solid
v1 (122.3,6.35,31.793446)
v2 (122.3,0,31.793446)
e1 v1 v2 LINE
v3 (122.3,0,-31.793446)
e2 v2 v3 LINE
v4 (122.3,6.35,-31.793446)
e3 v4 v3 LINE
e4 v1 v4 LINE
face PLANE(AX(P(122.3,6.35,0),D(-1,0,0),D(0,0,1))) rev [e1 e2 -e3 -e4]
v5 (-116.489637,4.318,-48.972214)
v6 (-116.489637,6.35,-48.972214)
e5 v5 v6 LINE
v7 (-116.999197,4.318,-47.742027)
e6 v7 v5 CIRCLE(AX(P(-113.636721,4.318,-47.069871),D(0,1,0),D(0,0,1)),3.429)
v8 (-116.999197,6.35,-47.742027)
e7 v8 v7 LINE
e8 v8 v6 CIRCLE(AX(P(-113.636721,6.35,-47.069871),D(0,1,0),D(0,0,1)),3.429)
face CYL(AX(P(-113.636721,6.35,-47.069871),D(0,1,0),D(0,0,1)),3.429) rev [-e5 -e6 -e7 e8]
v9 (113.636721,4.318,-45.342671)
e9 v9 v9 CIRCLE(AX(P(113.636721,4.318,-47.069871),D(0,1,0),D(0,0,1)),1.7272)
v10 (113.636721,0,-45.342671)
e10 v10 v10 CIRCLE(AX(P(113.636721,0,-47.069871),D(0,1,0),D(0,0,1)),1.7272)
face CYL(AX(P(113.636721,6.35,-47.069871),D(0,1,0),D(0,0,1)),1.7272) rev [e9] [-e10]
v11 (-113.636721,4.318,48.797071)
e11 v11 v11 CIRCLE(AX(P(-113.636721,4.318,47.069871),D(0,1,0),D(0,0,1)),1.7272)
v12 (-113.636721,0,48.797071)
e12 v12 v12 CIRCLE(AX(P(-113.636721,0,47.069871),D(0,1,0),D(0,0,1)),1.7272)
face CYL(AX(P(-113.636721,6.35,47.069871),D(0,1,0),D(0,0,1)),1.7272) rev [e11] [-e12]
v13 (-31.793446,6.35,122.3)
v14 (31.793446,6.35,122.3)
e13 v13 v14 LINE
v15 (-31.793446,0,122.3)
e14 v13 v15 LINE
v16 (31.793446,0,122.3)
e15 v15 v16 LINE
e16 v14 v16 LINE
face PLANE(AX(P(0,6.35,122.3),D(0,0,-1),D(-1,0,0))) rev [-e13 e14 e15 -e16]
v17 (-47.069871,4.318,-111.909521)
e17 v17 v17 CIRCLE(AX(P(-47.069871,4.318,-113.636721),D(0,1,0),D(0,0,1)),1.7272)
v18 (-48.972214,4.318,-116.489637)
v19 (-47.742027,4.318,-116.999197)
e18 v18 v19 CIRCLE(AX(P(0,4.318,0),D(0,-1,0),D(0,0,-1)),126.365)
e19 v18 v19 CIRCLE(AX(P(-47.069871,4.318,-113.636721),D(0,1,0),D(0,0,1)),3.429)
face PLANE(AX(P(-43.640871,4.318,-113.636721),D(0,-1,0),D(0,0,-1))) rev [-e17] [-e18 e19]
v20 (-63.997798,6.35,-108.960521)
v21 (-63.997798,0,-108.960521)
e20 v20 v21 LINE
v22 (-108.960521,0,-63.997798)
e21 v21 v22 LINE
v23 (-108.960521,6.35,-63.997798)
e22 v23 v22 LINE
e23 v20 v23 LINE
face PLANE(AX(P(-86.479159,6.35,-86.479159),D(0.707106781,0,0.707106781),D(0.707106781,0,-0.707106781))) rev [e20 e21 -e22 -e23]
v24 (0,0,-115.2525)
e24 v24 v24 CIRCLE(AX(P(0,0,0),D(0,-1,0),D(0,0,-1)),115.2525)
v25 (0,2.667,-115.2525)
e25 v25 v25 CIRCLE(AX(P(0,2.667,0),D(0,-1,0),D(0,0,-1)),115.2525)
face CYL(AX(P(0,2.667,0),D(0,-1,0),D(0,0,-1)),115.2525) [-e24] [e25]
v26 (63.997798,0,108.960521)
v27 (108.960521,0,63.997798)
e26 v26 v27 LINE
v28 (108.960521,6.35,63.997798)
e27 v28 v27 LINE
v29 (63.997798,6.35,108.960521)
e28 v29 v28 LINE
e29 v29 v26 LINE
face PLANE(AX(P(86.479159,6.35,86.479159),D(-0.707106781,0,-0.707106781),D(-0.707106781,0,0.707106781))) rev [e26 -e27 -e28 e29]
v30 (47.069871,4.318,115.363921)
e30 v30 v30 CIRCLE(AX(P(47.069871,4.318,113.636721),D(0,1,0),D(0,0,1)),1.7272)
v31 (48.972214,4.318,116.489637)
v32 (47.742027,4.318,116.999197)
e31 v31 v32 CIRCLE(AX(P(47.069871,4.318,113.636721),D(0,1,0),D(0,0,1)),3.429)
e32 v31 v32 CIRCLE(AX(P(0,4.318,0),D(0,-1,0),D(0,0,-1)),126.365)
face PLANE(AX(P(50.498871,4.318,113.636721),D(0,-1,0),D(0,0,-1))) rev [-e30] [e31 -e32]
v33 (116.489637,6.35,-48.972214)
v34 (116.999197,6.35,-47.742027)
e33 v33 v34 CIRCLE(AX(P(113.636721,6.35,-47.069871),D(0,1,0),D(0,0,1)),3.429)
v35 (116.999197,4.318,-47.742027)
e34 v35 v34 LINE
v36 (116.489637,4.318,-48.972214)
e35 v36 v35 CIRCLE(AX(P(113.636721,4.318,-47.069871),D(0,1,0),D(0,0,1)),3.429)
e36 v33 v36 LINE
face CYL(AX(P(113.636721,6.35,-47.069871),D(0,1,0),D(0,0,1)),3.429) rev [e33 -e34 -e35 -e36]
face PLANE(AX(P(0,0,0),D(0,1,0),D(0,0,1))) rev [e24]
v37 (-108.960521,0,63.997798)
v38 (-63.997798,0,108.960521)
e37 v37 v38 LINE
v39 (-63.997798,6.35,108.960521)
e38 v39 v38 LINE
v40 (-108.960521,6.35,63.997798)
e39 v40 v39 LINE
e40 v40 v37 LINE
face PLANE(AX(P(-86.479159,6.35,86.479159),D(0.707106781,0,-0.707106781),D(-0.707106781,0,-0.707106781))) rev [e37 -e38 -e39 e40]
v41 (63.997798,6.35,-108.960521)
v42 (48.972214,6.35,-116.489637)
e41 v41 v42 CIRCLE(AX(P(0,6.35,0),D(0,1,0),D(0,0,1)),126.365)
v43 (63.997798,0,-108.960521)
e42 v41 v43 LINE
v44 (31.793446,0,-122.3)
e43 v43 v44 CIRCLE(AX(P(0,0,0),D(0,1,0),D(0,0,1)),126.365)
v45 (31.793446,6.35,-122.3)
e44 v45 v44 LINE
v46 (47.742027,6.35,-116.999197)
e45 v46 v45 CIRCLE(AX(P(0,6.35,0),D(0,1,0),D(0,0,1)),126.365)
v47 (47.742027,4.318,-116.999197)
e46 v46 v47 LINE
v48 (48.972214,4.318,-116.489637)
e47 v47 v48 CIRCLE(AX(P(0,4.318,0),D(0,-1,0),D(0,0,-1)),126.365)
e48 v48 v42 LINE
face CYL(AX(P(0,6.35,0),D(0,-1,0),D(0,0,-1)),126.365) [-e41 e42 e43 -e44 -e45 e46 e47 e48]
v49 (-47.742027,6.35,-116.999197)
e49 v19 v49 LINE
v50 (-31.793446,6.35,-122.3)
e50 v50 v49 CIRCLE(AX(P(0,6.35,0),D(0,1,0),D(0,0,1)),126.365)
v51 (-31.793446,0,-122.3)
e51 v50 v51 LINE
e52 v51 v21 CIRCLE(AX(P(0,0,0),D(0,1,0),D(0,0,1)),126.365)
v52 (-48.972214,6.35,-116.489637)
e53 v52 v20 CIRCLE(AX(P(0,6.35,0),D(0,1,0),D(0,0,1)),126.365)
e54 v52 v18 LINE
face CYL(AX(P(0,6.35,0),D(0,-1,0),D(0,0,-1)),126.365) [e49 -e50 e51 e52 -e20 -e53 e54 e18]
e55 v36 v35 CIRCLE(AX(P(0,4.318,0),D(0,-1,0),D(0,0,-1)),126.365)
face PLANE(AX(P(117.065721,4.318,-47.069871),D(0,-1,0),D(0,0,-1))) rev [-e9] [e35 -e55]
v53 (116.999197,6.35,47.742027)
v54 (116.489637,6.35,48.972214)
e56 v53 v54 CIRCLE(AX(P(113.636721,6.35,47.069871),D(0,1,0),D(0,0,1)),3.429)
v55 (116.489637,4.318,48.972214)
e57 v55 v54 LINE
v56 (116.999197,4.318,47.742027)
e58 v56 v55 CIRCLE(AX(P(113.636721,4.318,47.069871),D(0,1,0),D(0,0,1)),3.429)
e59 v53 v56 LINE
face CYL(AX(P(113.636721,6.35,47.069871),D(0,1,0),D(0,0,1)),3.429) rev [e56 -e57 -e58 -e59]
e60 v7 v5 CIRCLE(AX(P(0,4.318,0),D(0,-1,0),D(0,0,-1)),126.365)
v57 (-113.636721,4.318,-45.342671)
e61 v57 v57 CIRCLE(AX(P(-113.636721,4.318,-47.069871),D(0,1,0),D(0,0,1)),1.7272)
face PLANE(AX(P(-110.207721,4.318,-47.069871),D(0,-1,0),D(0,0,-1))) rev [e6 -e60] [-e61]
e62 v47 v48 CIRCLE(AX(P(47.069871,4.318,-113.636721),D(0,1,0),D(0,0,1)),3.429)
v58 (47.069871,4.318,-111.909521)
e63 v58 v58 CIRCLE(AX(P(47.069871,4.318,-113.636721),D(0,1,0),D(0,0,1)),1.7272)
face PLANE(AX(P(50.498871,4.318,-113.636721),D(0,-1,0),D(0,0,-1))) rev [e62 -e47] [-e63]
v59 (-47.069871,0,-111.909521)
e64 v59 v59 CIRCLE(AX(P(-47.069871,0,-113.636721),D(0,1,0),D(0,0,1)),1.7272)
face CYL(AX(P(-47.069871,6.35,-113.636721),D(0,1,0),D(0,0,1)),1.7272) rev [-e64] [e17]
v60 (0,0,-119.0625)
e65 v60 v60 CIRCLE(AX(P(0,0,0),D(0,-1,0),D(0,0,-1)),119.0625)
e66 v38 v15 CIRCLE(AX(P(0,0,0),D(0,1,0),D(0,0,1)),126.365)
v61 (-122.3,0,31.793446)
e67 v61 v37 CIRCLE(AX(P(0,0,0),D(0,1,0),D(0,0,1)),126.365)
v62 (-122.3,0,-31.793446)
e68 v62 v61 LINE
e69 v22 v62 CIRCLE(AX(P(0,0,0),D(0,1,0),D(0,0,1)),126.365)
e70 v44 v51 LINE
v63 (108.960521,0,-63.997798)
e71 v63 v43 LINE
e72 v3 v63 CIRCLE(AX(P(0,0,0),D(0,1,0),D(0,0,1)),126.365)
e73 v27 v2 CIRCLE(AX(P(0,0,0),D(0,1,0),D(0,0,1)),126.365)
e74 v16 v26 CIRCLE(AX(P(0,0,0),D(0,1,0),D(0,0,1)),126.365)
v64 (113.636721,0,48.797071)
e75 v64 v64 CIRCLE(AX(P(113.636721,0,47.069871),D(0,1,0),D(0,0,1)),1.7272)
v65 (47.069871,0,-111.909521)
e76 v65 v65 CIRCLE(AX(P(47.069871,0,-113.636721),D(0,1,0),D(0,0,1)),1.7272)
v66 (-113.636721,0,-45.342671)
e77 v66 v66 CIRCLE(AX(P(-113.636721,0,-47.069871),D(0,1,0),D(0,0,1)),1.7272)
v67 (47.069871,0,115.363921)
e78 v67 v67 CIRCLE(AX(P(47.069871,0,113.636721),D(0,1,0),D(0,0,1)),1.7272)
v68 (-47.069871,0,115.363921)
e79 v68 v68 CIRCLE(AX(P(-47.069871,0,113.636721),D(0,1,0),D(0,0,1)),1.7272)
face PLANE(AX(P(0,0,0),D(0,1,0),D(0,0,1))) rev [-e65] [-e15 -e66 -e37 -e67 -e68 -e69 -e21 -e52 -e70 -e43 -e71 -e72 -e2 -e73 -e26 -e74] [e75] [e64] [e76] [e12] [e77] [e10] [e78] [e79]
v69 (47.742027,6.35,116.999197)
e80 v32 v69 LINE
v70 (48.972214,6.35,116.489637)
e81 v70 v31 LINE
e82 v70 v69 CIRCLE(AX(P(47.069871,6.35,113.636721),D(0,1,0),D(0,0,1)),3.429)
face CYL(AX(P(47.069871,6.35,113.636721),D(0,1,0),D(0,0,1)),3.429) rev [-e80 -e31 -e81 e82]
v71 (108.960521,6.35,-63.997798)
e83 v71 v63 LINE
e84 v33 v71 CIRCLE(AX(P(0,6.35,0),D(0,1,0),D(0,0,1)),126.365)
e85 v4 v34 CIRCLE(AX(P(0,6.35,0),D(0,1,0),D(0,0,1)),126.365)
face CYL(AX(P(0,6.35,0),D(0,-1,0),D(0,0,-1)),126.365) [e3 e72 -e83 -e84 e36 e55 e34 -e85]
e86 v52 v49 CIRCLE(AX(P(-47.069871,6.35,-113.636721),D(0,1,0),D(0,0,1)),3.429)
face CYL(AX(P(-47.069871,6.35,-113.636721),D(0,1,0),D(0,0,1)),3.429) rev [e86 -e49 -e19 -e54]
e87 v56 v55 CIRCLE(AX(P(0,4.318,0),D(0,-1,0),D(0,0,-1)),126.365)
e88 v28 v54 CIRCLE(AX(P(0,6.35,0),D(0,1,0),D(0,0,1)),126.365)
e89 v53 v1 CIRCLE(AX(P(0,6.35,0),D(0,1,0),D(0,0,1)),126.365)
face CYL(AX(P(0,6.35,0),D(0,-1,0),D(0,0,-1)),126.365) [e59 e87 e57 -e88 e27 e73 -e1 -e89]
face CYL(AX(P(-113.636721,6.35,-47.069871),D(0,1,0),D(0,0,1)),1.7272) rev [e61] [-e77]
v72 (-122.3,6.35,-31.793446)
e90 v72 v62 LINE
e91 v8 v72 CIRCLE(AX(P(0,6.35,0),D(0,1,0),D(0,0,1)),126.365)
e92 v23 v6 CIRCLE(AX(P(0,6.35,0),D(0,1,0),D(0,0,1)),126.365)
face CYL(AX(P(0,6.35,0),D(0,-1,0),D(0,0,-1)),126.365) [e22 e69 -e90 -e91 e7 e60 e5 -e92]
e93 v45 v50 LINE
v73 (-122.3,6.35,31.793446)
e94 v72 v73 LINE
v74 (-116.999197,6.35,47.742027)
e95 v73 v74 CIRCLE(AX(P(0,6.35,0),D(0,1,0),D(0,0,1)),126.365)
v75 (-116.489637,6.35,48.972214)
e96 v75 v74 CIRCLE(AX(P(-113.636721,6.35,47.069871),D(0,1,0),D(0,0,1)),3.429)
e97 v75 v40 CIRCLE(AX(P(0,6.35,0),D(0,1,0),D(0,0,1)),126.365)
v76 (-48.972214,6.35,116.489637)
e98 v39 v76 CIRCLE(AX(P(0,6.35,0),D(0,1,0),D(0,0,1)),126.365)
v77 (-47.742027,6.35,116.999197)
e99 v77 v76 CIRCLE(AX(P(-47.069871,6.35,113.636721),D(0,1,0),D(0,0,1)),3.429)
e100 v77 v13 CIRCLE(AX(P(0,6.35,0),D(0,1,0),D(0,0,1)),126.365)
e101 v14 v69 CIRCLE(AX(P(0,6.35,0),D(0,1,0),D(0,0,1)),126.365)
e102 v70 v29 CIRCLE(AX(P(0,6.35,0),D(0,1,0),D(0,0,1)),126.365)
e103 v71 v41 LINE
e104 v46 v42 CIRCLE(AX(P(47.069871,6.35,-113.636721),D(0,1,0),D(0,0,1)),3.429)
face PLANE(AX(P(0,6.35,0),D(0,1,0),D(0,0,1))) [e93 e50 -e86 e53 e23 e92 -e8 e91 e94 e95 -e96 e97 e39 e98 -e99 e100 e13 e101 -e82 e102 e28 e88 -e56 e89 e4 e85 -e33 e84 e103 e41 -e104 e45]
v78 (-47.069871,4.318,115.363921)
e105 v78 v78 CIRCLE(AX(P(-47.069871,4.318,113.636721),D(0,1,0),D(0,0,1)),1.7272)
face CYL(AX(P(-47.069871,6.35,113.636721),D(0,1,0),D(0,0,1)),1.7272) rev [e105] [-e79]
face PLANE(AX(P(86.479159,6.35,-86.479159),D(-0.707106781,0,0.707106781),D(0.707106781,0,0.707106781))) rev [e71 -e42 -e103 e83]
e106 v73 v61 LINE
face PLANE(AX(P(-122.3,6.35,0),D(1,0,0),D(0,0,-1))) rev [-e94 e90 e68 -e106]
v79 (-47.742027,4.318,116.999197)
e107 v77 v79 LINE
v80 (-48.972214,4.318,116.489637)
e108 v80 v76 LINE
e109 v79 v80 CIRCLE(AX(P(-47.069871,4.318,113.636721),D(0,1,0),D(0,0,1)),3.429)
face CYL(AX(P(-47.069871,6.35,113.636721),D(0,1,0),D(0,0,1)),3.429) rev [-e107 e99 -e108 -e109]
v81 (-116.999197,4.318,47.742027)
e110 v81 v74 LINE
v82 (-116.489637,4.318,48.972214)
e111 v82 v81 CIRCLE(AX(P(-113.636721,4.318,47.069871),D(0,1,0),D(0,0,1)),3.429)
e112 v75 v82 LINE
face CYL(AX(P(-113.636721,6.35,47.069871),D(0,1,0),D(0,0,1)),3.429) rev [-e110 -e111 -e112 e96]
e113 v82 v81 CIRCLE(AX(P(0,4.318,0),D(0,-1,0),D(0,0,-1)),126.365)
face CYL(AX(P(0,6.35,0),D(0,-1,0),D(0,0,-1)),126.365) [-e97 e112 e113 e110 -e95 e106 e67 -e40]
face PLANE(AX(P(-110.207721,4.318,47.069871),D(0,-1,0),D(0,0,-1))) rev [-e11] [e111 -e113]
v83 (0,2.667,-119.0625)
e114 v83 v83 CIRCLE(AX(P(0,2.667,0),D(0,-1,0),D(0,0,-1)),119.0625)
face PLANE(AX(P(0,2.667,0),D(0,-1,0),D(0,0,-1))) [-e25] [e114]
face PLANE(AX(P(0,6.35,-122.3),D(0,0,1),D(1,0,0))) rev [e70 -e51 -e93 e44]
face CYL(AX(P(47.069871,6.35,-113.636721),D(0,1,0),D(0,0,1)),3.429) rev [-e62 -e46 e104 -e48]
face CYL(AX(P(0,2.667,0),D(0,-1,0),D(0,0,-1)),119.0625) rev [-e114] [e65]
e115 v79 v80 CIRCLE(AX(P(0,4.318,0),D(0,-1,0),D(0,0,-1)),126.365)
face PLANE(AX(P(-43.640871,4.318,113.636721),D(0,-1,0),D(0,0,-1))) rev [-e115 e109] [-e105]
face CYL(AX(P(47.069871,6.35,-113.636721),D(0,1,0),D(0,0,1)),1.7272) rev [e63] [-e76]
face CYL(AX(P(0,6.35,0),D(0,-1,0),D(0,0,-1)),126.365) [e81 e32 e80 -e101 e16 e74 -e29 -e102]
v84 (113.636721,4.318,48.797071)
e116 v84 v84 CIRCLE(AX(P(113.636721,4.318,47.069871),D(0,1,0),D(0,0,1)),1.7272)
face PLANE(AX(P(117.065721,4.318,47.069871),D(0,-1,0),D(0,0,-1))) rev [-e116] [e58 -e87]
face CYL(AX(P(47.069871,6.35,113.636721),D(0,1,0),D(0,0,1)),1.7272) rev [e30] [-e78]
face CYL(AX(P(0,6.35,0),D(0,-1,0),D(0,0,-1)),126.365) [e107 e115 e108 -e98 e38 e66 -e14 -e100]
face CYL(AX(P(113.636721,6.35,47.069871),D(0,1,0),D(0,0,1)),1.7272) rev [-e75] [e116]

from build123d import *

# Parameters (mm, degrees)
BOSS_EXTRUDE1_DEPTH       = 6.35
SKETCH2_R                 = 119.0625
SKETCH2_R_2               = 115.2525
CUT_EXTRUDE1_DEPTH        = 2.667
ADVANCEDHOLE1_START       = 4.318
ADVANCEDHOLE1_DEPTH       = 2.032
ADVANCEDHOLE1_2_OUTLINE_R = 1.7272
ADVANCEDHOLE1_2_DEPTH     = 4.318
CIRPATTERN1_COUNT         = 8


# Read off the part's stored shape, not the designer's step: AdvancedHole1
with BuildPart() as part:
    # Sketch1 → Boss-Extrude1 (new body)
    with BuildSketch(Plane(origin=(0, 0, 0), x_dir=(1, 0, 0), z_dir=(0, 1, 0))):
        with BuildLine():
            ThreePointArc((-31.793446259, 122.3), (-48.357791931, 116.746037126), (-63.997797892, 108.960520786))
            Line((-63.997797892, 108.960520786), (-108.960520786, 63.997797892))
            ThreePointArc((-108.960520786, 63.997797892), (-116.746037126, 48.357791931), (-122.3, 31.793446259))
            Line((-122.3, 31.793446259), (-122.3, -31.793446259))
            ThreePointArc((-122.3, -31.793446259), (-116.746037126, -48.357791931), (-108.960520786, -63.997797892))
            Line((-108.960520786, -63.997797892), (-63.997797892, -108.960520786))
            ThreePointArc((-63.997797892, -108.960520786), (-48.357791931, -116.746037126), (-31.793446259, -122.3))
            Line((-31.793446259, -122.3), (31.793446259, -122.3))
            ThreePointArc((31.793446259, -122.3), (48.357791931, -116.746037126), (63.997797892, -108.960520786))
            Line((63.997797892, -108.960520786), (108.960520786, -63.997797892))
            ThreePointArc((108.960520786, -63.997797892), (116.746037126, -48.357791931), (122.3, -31.793446259))
            Line((122.3, -31.793446259), (122.3, 31.793446259))
            ThreePointArc((122.3, 31.793446259), (116.746037126, 48.357791931), (108.960520786, 63.997797892))
            Line((108.960520786, 63.997797892), (63.997797892, 108.960520786))
            ThreePointArc((63.997797892, 108.960520786), (48.357791931, 116.746037126), (31.793446259, 122.3))
            Line((31.793446259, 122.3), (-31.793446259, 122.3))
        make_face()
    extrude(amount=BOSS_EXTRUDE1_DEPTH)

    # Sketch2 → Cut-Extrude1 (cut)
    with BuildSketch(Plane.XZ):
        with Locations(Location((0, 0, 0), (0, 0, 270))):
            Circle(SKETCH2_R)
        with Locations(Location((0, 0, 0), (0, 0, 270))):
            Circle(SKETCH2_R_2, mode=Mode.SUBTRACT)
    extrude(amount=-CUT_EXTRUDE1_DEPTH, mode=Mode.SUBTRACT)

    # AdvancedHole1 outline → AdvancedHole1 (cut)
    with BuildSketch(Plane(origin=(0, 0, 0), x_dir=(1, 0, 0), z_dir=(0, 1, 0)).offset(ADVANCEDHOLE1_START)):
        with BuildLine():
            ThreePointArc((-47.742027192, 116.999196855), (-48.357791931, 116.746037126), (-48.972214314, 116.489636665))
            ThreePointArc((-48.972214314, 116.489636665), (-45.757649346, 110.468737644), (-47.742027192, 116.999196855))
        make_face()
    advancedhole1 = extrude(amount=ADVANCEDHOLE1_DEPTH, mode=Mode.SUBTRACT)

    # AdvancedHole1 2 outline → AdvancedHole1 2 (cut)
    with BuildSketch(Plane(origin=(0, 0, 0), x_dir=(1, 0, 0), z_dir=(0, 1, 0))):
        with Locations((-47.069870839, 113.636720559)):
            Circle(ADVANCEDHOLE1_2_OUTLINE_R)
    advancedhole1_2 = extrude(amount=ADVANCEDHOLE1_2_DEPTH, mode=Mode.SUBTRACT)

    # CirPattern1: AdvancedHole1, AdvancedHole1 2 ×8 about axis
    cirpattern1_axis = Axis((0, 0, 0), (0, 1, 0))
    add([advancedhole1.rotate(cirpattern1_axis, i * 360 / CIRPATTERN1_COUNT) for i in range(1, CIRPATTERN1_COUNT)], mode=Mode.SUBTRACT)
    add([advancedhole1_2.rotate(cirpattern1_axis, i * 360 / CIRPATTERN1_COUNT) for i in range(1, CIRPATTERN1_COUNT)], mode=Mode.SUBTRACT)


solid = part.part
